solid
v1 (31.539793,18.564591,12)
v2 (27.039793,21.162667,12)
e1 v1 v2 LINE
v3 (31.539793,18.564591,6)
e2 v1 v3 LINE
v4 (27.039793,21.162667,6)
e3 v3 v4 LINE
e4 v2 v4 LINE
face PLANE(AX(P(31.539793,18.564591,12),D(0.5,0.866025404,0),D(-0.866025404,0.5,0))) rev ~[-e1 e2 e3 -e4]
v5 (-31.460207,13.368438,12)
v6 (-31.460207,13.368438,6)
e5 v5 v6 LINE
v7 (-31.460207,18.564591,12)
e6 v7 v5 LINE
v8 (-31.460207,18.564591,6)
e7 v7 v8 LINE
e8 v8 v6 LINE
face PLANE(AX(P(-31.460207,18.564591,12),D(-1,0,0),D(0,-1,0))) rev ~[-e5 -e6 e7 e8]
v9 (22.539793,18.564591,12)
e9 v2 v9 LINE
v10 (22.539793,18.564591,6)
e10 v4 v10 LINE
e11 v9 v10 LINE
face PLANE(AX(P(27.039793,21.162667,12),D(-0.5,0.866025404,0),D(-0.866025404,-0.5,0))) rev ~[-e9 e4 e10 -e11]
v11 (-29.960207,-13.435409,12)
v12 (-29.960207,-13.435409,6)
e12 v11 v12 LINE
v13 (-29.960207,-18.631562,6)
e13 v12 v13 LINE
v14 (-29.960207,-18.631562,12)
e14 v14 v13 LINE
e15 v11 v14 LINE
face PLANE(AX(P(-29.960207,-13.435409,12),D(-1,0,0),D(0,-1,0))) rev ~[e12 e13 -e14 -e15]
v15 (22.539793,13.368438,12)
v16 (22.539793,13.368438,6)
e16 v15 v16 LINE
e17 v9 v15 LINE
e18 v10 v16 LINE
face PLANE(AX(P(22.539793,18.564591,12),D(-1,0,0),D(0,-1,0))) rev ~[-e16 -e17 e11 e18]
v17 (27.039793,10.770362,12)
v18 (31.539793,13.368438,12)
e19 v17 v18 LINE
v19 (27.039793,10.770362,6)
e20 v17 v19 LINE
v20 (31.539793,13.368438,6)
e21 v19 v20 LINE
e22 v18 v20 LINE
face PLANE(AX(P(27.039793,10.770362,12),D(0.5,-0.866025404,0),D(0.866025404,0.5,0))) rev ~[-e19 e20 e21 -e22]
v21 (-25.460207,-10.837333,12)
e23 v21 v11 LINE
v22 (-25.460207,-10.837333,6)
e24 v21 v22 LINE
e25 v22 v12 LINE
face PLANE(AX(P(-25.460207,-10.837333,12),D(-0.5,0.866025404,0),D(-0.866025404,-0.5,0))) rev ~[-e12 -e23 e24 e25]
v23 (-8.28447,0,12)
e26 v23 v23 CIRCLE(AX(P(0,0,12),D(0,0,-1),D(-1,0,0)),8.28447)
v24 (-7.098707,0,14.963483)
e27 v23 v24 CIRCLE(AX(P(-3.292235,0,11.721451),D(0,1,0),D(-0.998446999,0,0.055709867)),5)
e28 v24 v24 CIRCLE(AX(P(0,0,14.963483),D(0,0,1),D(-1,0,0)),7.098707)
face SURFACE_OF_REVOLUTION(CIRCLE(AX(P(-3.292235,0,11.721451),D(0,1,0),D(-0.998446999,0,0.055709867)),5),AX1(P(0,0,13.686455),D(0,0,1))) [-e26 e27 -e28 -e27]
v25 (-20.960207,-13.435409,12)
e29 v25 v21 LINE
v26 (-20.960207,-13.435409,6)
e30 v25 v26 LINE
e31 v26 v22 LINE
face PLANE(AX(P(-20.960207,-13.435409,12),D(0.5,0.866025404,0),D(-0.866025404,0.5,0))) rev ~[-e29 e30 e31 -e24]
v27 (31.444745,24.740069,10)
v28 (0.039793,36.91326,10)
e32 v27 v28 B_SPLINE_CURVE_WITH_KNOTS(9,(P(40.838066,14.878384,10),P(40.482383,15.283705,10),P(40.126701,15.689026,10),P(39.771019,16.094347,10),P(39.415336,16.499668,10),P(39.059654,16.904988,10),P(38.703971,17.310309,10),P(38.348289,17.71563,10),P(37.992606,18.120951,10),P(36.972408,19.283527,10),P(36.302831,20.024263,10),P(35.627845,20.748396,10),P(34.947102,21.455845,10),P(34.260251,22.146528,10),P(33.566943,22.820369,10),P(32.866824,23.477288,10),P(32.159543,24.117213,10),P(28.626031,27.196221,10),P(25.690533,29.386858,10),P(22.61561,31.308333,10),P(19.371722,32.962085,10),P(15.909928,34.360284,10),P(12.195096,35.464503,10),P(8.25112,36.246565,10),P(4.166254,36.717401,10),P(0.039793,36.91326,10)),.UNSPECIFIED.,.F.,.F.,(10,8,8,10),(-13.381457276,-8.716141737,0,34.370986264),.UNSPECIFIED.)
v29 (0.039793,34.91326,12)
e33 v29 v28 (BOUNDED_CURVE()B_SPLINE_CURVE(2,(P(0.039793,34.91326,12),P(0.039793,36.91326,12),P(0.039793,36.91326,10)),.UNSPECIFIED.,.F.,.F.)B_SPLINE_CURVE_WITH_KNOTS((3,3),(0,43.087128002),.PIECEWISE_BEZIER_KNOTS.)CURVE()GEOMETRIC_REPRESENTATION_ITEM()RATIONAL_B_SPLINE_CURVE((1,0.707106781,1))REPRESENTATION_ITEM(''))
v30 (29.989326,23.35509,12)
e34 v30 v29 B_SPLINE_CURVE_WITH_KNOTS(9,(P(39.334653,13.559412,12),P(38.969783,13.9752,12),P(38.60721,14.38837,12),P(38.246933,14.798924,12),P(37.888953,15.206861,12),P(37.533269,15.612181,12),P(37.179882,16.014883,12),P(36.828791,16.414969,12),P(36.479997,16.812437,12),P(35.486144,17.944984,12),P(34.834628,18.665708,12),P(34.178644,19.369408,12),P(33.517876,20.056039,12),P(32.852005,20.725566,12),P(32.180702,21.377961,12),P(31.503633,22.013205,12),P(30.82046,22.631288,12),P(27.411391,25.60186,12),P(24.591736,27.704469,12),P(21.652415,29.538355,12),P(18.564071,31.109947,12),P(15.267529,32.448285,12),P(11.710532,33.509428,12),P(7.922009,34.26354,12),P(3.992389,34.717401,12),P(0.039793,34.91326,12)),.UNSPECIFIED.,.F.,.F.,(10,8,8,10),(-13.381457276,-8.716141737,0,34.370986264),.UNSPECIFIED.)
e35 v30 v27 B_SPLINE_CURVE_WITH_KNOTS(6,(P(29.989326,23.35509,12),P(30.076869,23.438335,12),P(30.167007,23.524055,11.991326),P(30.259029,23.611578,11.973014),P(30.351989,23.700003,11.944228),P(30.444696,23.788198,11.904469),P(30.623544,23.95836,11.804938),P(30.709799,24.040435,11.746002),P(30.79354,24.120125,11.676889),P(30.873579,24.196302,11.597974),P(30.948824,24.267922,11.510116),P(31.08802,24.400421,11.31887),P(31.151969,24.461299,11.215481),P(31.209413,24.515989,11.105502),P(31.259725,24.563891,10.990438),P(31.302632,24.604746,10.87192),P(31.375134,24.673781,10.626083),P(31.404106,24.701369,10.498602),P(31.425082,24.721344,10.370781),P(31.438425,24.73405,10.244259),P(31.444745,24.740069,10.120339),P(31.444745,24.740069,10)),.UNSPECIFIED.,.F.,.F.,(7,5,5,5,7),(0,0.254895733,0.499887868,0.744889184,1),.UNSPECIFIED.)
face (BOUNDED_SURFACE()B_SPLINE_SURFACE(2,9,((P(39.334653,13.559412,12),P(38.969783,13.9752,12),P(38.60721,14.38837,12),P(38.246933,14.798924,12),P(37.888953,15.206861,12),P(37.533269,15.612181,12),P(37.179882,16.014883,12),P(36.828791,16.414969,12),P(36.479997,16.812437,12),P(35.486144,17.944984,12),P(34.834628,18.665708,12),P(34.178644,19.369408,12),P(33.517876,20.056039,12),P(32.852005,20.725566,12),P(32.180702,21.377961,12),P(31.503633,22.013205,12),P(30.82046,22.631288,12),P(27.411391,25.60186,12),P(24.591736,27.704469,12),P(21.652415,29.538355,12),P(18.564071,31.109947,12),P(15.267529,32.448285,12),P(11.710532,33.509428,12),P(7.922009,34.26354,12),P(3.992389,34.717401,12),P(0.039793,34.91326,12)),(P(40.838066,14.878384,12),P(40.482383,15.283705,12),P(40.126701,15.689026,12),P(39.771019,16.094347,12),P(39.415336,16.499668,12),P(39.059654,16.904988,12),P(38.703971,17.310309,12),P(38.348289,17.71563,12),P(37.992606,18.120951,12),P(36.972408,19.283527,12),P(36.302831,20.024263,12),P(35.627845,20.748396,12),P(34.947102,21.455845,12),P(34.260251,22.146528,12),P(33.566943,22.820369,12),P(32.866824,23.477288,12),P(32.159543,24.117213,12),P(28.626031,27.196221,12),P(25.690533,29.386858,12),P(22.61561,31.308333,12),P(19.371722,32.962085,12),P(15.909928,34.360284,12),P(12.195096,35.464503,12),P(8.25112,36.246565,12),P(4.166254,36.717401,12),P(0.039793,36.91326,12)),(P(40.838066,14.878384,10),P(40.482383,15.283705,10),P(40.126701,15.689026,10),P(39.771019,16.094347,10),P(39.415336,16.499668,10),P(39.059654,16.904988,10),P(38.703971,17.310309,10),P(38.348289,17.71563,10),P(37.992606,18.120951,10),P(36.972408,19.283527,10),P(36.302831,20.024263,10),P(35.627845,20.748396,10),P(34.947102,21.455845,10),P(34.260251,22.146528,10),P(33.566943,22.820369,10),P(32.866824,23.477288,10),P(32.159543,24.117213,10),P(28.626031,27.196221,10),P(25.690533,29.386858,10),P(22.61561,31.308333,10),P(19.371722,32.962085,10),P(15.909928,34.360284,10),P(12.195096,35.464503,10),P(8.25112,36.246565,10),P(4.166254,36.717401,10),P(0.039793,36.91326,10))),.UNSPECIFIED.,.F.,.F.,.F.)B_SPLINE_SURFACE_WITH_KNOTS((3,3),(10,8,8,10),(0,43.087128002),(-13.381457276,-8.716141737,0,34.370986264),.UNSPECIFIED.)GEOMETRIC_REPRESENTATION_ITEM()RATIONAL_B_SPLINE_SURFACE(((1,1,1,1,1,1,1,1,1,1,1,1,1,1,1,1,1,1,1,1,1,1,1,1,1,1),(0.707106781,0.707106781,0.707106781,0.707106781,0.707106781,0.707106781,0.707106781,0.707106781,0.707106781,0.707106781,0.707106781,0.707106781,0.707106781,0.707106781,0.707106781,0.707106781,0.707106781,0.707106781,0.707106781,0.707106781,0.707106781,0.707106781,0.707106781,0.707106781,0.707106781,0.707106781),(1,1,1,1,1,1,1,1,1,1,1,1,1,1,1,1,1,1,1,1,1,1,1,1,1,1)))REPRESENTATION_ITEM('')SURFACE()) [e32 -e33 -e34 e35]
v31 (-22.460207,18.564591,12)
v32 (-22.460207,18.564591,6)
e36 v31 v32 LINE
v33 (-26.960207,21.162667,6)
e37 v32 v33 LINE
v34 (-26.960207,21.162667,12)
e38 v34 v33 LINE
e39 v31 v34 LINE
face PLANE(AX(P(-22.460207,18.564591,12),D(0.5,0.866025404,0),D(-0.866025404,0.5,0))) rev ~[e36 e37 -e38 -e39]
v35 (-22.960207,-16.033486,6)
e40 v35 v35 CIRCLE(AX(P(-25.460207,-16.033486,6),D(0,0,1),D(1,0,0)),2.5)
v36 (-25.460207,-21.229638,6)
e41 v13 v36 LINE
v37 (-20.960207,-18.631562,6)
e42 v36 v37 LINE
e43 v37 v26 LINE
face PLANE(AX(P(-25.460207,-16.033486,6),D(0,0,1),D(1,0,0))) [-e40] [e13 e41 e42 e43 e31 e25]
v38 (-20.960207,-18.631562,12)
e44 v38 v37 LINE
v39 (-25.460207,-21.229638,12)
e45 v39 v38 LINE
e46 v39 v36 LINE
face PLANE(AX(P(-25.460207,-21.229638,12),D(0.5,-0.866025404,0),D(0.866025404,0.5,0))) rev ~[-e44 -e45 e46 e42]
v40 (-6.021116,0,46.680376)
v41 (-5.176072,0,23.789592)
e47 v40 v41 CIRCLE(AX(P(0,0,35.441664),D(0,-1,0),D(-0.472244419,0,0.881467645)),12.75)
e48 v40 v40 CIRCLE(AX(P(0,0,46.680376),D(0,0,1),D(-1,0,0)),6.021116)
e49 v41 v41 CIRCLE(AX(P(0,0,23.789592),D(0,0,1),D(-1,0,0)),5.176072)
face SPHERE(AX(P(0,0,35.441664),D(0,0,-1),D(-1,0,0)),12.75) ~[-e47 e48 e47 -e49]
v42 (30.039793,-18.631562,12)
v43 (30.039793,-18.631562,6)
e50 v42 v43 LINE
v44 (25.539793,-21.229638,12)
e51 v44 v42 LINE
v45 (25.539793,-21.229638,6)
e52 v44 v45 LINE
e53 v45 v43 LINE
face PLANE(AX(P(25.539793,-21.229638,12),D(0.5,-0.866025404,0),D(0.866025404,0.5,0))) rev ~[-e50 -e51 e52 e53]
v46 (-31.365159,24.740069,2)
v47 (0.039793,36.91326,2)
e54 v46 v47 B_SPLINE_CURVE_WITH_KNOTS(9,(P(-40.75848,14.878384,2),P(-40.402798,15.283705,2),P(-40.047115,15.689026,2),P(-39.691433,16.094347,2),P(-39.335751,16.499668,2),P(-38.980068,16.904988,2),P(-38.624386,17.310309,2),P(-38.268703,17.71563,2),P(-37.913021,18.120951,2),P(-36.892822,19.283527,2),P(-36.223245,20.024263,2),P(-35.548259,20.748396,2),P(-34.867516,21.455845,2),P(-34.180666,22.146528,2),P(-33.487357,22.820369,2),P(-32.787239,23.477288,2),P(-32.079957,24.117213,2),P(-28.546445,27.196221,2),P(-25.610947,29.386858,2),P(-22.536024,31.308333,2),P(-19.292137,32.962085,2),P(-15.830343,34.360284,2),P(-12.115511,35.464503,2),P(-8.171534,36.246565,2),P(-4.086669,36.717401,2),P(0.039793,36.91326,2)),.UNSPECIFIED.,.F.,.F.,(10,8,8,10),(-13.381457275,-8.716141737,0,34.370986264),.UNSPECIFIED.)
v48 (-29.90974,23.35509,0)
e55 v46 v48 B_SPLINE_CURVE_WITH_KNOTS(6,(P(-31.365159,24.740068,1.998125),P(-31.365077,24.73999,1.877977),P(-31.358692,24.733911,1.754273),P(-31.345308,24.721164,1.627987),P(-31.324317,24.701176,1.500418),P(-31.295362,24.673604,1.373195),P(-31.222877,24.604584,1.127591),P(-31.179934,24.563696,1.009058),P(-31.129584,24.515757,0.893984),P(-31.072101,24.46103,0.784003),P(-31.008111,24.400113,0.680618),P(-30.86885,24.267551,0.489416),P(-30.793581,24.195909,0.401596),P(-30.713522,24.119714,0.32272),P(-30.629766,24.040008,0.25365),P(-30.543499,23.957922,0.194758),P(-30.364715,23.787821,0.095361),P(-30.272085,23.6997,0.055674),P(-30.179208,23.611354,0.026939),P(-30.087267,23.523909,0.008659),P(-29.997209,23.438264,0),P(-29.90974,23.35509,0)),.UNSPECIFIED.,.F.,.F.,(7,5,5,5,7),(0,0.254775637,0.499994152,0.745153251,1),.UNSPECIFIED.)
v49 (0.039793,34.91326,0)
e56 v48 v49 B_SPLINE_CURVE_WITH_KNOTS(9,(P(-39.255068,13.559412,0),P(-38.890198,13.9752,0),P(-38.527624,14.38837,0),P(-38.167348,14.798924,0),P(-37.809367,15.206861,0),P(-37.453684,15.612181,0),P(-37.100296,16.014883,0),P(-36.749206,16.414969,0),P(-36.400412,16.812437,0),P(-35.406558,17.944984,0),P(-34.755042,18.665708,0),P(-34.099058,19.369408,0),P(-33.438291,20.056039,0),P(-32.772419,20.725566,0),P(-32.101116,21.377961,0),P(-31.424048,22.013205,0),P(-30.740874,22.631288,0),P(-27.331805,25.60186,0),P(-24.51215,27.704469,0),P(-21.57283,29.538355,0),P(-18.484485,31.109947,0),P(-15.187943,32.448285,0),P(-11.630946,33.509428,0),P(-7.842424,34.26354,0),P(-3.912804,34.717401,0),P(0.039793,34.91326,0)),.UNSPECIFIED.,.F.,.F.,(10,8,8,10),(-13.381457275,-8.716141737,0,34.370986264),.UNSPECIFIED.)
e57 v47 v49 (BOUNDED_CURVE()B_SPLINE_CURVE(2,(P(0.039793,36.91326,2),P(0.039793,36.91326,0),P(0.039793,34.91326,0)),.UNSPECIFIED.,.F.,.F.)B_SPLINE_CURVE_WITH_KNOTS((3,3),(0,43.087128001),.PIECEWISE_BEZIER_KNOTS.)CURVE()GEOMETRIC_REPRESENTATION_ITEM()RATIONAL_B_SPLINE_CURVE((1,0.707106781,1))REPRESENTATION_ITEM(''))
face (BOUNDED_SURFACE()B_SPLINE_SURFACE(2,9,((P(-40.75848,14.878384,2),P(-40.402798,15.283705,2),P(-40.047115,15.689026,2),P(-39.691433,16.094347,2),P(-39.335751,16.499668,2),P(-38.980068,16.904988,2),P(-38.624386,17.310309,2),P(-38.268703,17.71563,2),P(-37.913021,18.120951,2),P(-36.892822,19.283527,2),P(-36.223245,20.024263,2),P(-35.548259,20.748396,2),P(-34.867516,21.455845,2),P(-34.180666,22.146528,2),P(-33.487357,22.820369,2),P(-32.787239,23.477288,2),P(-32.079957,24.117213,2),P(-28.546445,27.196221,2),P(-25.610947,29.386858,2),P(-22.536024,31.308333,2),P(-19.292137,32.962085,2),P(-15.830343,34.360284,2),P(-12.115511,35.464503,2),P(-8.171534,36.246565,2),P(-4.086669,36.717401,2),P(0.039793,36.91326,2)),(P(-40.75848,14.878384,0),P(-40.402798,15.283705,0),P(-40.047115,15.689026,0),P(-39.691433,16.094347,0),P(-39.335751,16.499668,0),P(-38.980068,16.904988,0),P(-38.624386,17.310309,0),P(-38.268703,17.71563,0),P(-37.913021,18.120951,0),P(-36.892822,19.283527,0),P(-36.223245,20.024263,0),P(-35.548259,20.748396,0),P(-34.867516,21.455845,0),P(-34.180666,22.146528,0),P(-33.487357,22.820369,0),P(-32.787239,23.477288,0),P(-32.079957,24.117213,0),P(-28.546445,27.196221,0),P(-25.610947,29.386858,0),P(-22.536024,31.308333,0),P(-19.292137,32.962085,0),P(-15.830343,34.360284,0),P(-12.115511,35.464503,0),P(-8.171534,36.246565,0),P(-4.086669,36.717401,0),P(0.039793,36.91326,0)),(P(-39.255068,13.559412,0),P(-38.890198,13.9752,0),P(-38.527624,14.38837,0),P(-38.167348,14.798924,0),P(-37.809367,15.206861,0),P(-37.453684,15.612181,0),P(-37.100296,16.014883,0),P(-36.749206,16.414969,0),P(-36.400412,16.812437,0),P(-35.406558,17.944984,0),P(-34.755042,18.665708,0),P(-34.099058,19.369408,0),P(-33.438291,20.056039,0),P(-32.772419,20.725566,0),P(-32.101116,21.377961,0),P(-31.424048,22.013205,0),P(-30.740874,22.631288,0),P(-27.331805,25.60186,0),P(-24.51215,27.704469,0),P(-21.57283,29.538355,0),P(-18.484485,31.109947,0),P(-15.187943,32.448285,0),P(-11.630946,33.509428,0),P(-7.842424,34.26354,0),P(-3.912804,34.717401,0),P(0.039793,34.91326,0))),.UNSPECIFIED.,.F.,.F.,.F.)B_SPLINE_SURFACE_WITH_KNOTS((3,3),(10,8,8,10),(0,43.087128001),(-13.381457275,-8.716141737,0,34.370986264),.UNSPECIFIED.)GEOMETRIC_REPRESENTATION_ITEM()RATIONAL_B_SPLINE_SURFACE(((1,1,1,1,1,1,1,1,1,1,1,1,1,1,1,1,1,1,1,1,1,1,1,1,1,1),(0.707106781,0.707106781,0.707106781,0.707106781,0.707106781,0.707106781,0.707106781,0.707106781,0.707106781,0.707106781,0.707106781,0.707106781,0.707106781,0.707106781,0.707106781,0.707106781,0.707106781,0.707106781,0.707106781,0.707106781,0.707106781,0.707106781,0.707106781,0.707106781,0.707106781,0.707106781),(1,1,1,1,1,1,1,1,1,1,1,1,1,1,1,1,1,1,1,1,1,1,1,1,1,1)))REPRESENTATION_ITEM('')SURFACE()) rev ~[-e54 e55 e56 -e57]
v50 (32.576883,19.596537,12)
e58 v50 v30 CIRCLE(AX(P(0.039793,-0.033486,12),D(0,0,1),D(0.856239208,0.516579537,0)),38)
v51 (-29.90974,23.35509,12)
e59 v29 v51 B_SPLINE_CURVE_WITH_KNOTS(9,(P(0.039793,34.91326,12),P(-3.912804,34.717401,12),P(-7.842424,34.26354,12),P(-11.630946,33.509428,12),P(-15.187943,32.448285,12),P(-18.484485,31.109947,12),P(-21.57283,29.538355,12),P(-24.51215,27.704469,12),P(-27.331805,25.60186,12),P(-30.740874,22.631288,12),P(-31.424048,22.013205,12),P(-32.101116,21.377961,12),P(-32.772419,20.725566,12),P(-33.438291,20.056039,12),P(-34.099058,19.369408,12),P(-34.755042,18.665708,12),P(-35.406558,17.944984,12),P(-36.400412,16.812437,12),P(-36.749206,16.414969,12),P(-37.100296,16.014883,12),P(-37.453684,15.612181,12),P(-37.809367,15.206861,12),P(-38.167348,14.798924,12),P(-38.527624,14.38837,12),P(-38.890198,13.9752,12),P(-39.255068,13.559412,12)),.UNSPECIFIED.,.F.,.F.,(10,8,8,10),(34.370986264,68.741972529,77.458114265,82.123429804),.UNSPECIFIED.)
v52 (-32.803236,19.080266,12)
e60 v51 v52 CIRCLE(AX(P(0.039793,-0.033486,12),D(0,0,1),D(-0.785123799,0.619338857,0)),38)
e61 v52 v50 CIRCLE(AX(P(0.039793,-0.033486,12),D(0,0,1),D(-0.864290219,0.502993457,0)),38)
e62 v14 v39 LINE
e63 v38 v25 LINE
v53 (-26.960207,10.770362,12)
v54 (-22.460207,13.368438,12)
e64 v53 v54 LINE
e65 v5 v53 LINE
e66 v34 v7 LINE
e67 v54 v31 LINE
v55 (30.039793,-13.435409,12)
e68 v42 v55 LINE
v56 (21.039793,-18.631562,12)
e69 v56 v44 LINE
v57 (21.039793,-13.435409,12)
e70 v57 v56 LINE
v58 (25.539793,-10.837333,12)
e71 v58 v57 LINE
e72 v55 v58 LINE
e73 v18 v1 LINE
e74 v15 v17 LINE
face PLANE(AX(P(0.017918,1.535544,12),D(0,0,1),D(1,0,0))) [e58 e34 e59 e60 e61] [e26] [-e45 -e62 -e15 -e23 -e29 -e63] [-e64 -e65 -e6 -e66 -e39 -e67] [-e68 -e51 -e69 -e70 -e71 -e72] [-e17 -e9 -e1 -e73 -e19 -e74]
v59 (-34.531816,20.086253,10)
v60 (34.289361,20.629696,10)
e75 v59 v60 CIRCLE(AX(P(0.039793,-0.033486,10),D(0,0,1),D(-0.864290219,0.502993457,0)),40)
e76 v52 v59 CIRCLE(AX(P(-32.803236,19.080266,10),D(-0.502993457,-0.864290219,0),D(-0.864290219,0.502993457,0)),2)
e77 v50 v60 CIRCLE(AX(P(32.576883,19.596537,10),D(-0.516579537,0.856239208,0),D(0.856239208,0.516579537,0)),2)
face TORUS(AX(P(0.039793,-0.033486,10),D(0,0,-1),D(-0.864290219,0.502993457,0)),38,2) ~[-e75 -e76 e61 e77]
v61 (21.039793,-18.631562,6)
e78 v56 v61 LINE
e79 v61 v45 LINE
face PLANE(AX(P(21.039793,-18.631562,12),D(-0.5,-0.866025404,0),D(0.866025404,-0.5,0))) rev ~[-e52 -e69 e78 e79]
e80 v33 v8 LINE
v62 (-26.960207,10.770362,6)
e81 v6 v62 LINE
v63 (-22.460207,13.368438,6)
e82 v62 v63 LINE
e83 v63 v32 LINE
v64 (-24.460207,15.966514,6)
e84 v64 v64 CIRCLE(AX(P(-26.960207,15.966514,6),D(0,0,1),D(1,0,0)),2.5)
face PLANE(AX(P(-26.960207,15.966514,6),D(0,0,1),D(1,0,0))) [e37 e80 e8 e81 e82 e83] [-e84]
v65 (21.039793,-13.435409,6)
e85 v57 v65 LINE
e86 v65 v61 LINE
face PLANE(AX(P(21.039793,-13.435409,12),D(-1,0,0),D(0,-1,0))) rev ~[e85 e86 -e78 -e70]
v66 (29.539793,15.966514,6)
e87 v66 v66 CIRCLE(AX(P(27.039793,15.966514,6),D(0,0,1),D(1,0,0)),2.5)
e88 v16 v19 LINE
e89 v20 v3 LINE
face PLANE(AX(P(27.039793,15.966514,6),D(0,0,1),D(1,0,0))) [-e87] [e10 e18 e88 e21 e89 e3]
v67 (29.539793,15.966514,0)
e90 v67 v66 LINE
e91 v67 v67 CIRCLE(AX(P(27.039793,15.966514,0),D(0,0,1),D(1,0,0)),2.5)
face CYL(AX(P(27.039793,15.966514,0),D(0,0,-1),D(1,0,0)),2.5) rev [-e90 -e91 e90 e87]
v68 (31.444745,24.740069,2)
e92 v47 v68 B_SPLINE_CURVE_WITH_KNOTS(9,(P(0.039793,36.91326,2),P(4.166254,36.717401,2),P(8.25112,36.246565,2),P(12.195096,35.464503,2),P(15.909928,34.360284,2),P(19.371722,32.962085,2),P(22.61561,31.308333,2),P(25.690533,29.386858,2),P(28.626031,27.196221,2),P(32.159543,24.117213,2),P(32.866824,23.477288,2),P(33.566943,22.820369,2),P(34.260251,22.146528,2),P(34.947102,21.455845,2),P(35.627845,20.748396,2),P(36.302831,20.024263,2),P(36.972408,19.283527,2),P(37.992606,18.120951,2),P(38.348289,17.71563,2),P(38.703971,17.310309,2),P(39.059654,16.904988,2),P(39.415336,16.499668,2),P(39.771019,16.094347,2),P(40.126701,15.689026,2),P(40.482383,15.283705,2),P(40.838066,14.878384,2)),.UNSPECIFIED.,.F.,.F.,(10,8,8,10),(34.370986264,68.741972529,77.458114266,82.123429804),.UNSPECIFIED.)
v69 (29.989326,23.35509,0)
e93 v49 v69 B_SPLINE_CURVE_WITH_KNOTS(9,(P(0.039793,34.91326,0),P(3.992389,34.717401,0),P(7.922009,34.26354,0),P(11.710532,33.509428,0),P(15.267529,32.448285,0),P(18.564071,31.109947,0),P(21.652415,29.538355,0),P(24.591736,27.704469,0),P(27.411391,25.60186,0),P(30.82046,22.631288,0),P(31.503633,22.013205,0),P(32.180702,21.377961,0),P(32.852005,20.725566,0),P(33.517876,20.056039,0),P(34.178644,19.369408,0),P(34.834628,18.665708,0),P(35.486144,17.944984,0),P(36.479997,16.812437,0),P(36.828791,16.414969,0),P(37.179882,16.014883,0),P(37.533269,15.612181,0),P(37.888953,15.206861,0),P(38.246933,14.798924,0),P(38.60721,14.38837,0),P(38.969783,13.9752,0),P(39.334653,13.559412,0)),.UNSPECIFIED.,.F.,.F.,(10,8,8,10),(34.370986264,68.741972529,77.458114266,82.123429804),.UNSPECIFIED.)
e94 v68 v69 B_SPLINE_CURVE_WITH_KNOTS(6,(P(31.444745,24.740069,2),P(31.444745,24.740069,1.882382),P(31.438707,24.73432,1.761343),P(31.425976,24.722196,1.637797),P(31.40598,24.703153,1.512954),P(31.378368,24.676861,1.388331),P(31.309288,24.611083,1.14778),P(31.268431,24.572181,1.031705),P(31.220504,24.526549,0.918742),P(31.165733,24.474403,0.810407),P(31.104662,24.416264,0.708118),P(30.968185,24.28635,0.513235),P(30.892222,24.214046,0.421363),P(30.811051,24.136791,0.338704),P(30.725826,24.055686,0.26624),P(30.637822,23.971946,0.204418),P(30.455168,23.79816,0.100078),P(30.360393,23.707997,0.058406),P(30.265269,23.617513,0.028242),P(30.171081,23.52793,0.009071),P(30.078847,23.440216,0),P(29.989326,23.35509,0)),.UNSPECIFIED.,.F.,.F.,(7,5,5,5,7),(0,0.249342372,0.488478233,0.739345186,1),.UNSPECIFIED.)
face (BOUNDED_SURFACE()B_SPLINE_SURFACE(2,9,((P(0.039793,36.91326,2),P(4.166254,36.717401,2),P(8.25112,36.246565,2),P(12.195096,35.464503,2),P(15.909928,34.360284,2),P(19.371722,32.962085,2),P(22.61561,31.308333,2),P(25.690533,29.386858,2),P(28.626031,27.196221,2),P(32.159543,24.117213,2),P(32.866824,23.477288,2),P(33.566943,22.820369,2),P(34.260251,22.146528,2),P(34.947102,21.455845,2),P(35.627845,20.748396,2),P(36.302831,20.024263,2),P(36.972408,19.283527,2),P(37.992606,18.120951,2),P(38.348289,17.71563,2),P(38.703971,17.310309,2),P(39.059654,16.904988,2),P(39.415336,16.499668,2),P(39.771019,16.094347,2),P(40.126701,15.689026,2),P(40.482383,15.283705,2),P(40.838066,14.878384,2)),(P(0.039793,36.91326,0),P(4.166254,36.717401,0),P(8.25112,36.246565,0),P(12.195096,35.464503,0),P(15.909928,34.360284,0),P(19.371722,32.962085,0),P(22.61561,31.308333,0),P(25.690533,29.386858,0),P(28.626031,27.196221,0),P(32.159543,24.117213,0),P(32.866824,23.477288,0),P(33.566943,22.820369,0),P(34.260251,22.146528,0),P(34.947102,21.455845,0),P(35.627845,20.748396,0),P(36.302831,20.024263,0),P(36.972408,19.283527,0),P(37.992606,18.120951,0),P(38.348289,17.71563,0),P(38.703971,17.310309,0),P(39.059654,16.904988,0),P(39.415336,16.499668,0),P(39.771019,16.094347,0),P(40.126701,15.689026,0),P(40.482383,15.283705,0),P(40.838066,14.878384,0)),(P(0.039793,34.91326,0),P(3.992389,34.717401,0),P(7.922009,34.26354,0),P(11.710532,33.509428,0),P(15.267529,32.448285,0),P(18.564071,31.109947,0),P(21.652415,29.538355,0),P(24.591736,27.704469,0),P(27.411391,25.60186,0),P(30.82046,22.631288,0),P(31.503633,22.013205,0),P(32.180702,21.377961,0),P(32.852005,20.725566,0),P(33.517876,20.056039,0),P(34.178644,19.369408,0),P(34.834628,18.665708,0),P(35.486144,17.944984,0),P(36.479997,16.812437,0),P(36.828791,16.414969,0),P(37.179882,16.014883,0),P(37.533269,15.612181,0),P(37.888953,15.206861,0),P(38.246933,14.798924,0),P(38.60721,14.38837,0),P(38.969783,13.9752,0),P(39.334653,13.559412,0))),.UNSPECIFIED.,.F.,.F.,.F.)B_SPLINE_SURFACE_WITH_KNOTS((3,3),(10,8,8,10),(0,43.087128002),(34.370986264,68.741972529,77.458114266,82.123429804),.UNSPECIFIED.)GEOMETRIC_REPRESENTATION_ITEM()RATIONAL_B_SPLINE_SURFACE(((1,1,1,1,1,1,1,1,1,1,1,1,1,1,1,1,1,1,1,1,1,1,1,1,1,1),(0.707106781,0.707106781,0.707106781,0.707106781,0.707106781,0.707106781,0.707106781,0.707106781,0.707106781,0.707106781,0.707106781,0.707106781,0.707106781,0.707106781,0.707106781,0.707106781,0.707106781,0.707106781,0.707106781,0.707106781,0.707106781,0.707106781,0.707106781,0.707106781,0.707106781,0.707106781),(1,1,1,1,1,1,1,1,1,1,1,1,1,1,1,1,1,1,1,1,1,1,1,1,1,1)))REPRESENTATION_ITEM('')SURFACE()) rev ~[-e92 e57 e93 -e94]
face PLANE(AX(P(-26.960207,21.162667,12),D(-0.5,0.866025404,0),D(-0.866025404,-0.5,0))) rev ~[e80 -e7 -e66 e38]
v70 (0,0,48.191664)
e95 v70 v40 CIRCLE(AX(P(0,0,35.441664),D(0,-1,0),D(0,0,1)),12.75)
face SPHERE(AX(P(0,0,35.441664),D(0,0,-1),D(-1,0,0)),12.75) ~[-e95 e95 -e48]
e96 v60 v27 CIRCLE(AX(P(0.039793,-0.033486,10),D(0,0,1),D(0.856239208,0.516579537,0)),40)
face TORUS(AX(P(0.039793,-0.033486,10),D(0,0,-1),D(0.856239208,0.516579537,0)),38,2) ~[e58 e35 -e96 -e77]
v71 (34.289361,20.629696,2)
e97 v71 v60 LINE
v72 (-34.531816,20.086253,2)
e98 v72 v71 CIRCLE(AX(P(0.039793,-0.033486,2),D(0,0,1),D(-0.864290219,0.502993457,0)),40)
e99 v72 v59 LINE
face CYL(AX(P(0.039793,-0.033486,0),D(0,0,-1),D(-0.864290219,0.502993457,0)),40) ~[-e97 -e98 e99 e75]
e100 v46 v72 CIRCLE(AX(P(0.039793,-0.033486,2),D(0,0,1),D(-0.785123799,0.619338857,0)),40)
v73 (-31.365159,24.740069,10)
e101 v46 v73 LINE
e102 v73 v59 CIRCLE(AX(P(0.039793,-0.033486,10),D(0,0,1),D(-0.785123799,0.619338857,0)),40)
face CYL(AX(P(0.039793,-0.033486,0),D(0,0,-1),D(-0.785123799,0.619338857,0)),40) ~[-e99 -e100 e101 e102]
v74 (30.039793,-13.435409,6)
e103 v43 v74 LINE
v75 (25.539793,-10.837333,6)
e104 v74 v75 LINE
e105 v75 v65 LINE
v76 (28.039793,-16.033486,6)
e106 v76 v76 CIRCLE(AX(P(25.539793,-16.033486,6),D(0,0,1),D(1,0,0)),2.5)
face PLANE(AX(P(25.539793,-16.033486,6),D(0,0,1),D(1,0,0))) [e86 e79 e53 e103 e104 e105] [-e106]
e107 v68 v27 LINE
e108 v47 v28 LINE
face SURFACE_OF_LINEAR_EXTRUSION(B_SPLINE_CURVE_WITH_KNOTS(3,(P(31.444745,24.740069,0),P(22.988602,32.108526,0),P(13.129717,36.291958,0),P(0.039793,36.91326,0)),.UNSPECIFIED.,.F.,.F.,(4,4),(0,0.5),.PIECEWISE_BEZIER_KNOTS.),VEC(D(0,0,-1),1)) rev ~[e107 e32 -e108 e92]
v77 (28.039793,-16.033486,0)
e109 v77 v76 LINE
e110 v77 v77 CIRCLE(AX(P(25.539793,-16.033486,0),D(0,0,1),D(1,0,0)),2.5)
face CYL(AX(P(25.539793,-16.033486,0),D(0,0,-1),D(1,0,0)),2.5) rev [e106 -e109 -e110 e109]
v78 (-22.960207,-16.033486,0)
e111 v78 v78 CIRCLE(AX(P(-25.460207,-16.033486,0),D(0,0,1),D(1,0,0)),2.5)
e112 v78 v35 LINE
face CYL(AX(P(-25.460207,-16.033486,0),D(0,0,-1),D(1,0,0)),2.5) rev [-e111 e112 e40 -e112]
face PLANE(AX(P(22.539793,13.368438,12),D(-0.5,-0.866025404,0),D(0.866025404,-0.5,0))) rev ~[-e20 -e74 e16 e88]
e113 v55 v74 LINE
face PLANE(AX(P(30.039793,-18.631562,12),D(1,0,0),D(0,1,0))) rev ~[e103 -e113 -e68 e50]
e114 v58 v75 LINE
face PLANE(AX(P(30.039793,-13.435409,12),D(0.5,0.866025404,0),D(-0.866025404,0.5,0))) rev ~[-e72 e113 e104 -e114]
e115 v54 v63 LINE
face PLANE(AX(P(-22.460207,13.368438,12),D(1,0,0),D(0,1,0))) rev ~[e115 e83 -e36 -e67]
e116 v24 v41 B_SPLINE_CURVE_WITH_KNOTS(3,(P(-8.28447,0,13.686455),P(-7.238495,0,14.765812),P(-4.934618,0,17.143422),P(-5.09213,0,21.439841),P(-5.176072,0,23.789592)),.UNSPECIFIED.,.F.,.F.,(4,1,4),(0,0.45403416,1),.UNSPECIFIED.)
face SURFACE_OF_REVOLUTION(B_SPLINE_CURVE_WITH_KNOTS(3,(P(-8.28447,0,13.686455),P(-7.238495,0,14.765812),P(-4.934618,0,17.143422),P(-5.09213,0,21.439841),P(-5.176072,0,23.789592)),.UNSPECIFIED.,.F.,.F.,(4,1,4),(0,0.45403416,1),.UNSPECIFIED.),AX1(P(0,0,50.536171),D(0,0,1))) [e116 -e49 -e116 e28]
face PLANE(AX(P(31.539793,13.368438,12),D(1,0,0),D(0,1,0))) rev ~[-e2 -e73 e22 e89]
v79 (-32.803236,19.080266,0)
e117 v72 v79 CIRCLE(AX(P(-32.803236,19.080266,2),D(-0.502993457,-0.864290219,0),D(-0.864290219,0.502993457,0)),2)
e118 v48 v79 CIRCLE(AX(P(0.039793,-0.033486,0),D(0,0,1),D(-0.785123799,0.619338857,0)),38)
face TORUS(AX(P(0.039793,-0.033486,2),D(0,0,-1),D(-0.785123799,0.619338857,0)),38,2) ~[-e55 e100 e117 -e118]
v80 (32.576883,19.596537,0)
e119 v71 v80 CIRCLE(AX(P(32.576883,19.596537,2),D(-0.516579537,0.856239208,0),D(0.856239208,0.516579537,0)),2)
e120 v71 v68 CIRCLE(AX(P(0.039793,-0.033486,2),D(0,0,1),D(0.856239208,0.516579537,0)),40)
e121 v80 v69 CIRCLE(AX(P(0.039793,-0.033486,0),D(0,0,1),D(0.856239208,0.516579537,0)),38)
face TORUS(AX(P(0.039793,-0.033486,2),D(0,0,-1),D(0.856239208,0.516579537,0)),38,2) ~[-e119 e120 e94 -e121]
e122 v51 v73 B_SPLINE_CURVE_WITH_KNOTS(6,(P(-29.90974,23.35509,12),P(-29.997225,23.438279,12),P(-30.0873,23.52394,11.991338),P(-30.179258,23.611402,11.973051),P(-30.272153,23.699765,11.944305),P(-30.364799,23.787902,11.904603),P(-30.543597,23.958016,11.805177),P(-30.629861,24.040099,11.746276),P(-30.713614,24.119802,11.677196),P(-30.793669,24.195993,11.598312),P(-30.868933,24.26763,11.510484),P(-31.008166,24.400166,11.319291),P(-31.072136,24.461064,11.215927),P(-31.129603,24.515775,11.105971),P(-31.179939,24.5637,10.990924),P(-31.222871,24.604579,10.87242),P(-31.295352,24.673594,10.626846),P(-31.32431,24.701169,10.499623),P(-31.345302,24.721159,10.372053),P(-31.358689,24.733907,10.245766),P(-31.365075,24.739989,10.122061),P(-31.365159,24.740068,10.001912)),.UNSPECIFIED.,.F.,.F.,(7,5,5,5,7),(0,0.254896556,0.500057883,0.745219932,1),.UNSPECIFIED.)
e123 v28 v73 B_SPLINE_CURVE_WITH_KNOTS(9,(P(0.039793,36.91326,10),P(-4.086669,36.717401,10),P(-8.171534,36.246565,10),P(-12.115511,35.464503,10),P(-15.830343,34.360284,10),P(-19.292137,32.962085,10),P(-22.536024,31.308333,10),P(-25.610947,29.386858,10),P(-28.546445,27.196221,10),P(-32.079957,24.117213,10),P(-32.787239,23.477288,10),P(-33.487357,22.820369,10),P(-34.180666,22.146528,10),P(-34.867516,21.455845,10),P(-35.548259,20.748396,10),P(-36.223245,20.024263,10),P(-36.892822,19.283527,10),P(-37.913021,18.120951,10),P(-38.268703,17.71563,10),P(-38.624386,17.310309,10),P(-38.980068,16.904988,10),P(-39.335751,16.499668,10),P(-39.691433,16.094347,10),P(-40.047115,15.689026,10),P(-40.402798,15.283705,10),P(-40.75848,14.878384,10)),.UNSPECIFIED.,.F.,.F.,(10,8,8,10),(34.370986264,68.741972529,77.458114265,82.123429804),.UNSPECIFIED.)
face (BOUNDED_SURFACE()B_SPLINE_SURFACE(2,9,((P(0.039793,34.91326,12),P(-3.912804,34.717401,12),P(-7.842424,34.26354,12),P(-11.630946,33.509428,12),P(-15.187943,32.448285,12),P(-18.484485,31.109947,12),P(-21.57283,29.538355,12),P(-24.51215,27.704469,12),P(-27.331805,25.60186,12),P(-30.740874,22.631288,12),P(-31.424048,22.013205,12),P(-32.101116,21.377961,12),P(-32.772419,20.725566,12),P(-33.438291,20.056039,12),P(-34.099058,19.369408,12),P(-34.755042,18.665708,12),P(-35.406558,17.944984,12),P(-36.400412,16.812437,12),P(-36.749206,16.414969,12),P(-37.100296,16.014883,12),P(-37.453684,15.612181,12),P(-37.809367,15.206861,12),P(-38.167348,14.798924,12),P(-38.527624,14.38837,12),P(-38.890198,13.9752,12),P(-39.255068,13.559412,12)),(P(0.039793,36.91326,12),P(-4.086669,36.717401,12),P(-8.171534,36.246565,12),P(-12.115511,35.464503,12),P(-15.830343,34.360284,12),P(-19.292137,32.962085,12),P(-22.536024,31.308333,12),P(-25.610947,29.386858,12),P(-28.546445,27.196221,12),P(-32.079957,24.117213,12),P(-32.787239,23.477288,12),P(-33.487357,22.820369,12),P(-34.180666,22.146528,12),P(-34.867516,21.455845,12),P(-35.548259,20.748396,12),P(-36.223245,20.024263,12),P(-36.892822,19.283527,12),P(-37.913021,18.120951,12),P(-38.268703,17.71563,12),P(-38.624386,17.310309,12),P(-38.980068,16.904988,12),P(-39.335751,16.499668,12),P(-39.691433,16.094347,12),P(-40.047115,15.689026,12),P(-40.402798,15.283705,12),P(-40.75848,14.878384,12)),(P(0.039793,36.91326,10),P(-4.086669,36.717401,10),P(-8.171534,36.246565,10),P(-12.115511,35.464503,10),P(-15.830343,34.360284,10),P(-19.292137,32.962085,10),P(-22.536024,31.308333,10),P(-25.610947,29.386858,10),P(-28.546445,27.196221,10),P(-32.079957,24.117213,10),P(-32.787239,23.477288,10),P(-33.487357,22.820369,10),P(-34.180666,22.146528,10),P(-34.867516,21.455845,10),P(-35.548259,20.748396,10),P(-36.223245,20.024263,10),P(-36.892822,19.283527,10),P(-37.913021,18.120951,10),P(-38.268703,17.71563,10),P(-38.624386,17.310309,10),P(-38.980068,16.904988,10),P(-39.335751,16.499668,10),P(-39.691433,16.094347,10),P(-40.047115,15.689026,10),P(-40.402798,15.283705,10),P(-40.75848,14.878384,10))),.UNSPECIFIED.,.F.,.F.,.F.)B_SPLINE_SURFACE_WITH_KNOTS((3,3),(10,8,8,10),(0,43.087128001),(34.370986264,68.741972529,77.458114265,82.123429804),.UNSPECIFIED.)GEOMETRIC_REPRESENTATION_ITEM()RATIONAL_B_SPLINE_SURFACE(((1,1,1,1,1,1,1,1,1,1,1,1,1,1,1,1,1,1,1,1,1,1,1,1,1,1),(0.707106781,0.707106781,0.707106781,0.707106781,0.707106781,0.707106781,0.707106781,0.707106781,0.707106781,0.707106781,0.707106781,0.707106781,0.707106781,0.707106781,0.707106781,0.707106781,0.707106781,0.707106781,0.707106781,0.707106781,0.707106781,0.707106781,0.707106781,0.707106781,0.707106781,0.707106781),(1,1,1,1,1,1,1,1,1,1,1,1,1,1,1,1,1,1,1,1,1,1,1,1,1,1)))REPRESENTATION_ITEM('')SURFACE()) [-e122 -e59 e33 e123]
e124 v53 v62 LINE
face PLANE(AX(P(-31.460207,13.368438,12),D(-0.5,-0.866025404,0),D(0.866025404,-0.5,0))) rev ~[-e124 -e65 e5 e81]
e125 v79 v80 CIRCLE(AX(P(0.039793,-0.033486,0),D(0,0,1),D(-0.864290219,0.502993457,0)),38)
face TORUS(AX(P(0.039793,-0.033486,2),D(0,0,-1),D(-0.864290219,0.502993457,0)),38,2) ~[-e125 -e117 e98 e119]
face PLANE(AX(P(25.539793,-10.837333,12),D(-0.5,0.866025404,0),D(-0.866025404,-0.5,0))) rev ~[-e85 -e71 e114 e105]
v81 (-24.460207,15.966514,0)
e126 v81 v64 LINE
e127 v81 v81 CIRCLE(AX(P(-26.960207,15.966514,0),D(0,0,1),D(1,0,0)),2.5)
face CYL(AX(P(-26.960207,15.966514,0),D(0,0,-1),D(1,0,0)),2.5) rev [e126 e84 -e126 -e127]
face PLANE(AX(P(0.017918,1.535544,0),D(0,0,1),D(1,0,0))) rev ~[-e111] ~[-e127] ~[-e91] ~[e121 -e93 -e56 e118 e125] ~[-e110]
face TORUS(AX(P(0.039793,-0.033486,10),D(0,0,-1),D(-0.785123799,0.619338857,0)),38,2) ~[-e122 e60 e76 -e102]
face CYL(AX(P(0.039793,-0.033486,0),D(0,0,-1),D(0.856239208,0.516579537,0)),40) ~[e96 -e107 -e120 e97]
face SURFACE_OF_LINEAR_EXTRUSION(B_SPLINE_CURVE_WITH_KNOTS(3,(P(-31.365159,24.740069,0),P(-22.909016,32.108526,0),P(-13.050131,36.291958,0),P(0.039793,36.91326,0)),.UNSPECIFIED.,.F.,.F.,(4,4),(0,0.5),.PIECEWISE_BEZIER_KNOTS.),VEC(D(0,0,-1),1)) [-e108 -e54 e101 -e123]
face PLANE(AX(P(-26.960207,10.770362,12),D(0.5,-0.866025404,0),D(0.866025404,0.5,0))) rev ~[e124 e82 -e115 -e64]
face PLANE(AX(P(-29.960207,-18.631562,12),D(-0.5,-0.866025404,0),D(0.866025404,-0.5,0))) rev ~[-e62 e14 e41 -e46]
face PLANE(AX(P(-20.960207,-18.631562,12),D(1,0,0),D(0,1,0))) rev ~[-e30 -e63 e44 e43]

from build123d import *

# Parameters (mm, degrees)
F0_R     = 2.5
F1_DEPTH = 12
F3_R     = 2.5
F4_DEPTH = 6
F8_R     = 2


# Not quite as in the source:
# - a fillet or chamfer that OpenCascade refuses, or shapes differently, is made with other operations: its cross-section is extruded or revolved along the edge and cut away or added


with BuildPart() as f1:
    # F0 (on Top) → F1 (new body)
    with BuildSketch(Plane.XY):
        with BuildLine():
            ThreePointArc((-31.3651592039, 24.7400687451), (-33.0304528025, 22.4689333996), (-34.5318159842, 20.0862527403))
            ThreePointArc((-34.5318159842, 20.0862527403), (0.3556410553, -40.0322385106), (34.289361103, 20.6296959515))
            ThreePointArc((34.289361103, 20.6296959515), (32.9313235996, 22.7293613836), (31.4447447441, 24.7400687451))
            add(Edge.make_bspline(
                [(31.4447447441, 24.7400687451), (22.988602022, 32.1085255021), (13.1297165658, 36.2919575894), (0.0397927701, 36.9132596428)],
                knots=[0, 0, 0, 0, 0.5, 0.5, 0.5, 0.5], degree=3))
            add(Edge.make_bspline(
                [(-31.3651592039, 24.7400687451), (-22.9090164817, 32.1085255021), (-13.0501310255, 36.2919575894), (0.0397927701, 36.9132596428)],
                knots=[0, 0, 0, 0, 0.5, 0.5, 0.5, 0.5], degree=3))
        make_face()
        with Locations((-25.4602072299, -16.0334855318)):
            Circle(F0_R, mode=Mode.SUBTRACT)
        with Locations((25.5397927701, -16.0334855318)):
            Circle(F0_R, mode=Mode.SUBTRACT)
        with Locations((-26.9602072299, 15.9665144682)):
            Circle(F0_R, mode=Mode.SUBTRACT)
        with Locations((27.0397927701, 15.9665144682)):
            Circle(F0_R, mode=Mode.SUBTRACT)
    extrude(amount=F1_DEPTH)

    # F3 (on face) → F4 (cut)
    with BuildSketch(Plane.XY.offset(12)):
        Polygon((-22.4602072299, 13.3684382568), (-22.4602072299, 18.5645906795), (-26.9602072299, 21.1626668909), (-31.4602072299, 18.5645906795), (-31.4602072299, 13.3684382568), (-26.9602072299, 10.7703620455), align=None)
        with Locations((-26.9602072299, 15.9665144682)):
            Circle(F3_R, mode=Mode.SUBTRACT)
        Polygon((22.5397927701, 18.5645906795), (22.5397927701, 13.3684382568), (27.0397927701, 10.7703620455), (31.5397927701, 13.3684382568), (31.5397927701, 18.5645906795), (27.0397927701, 21.1626668909), align=None)
        with Locations((27.0397927701, 15.9665144682)):
            Circle(F3_R, mode=Mode.SUBTRACT)
        Polygon((21.0397927701, -13.4354093205), (21.0397927701, -18.6315617432), (25.5397927701, -21.2296379545), (30.0397927701, -18.6315617432), (30.0397927701, -13.4354093205), (25.5397927701, -10.8373331091), align=None)
        with Locations((25.5397927701, -16.0334855318)):
            Circle(F3_R, mode=Mode.SUBTRACT)
        Polygon((-20.9602072299, -18.6315617432), (-20.9602072299, -13.4354093205), (-25.4602072299, -10.8373331091), (-29.9602072299, -13.4354093205), (-29.9602072299, -18.6315617432), (-25.4602072299, -21.2296379545), align=None)
        with Locations((-25.4602072299, -16.0334855318)):
            Circle(F3_R, mode=Mode.SUBTRACT)
    extrude(amount=-F4_DEPTH, mode=Mode.SUBTRACT)

    # F5 (on Front) → F6 (revolve)
    with BuildSketch(Plane.XZ):
        with BuildLine():
            Line((-8.284470181, 11.8907699668), (0, 11.8907699668))
            Line((0, 11.8907699668), (0, 48.1916638966))
            ThreePointArc((0, 48.1916638966), (-3.1039423325, 47.8080717015), (-6.0211163429, 46.6803763667))
            ThreePointArc((-6.0211163429, 46.6803763667), (-12.7413209188, 34.9713010104), (-5.1760724611, 23.7895922406))
            add(Edge.make_bspline(
                [(-8.284470181, 13.6864552548), (-7.2384952575, 14.7658121918), (-4.9346184441, 17.14342214), (-5.0921300249, 21.4398414936), (-5.1760724611, 23.7895922406)],
                knots=[0, 0, 0, 0, 0.4540341601, 1, 1, 1, 1], degree=3))
            Line((-8.284470181, 13.6864552548), (-8.284470181, 11.8907699668))
        make_face()
    revolve(axis=Axis((0, 0, 50.5361706018), (0, 0, 1)))

    # F7: fillet of radius 5 on 1 edges, made by hand

    # F7_s1 → F7_t2 (revolve, cut)
    with BuildSketch(Plane.XZ):
        with BuildLine():
            ThreePointArc((-8.284470181, 12), (-7.9344186734, 13.5789038819), (-7.0987068449, 14.9634829753))
            Line((-7.0987068449, 14.9634829753), (-7.1748362782, 15.0283236215))
            ThreePointArc((-7.1748362782, 15.0283236215), (-7.7543234481, 14.3838527889), (-8.3562826351, 13.7560467158))
            Line((-8.3562826351, 13.7560467158), (-8.384470181, 13.6864552548))
            ThreePointArc((-8.384470181, 13.6864552548), (-8.384470181, 12.8432276274), (-8.384314881, 12.0055709867))
            Line((-8.384314881, 12.0055709867), (-8.284470181, 12))
        make_face()
    revolve(axis=Axis((0, 0, 13.6864552548), (0, 0, 1)), mode=Mode.SUBTRACT)

    # F8
    f8_edges = [f1.edges().sort_by_distance(p)[0] for p in [
        (-2.459557, -39.955325, 12),
        (-2.459557, -39.955325, 0),
        (16.831403, 33.608309, 12),
        (-16.751817, 33.608309, 12),
        (-16.751817, 33.608309, 0),
        (16.831403, 33.608309, 0),
    ]]
    fillet(f8_edges, radius=F8_R)


solid = f1.part
